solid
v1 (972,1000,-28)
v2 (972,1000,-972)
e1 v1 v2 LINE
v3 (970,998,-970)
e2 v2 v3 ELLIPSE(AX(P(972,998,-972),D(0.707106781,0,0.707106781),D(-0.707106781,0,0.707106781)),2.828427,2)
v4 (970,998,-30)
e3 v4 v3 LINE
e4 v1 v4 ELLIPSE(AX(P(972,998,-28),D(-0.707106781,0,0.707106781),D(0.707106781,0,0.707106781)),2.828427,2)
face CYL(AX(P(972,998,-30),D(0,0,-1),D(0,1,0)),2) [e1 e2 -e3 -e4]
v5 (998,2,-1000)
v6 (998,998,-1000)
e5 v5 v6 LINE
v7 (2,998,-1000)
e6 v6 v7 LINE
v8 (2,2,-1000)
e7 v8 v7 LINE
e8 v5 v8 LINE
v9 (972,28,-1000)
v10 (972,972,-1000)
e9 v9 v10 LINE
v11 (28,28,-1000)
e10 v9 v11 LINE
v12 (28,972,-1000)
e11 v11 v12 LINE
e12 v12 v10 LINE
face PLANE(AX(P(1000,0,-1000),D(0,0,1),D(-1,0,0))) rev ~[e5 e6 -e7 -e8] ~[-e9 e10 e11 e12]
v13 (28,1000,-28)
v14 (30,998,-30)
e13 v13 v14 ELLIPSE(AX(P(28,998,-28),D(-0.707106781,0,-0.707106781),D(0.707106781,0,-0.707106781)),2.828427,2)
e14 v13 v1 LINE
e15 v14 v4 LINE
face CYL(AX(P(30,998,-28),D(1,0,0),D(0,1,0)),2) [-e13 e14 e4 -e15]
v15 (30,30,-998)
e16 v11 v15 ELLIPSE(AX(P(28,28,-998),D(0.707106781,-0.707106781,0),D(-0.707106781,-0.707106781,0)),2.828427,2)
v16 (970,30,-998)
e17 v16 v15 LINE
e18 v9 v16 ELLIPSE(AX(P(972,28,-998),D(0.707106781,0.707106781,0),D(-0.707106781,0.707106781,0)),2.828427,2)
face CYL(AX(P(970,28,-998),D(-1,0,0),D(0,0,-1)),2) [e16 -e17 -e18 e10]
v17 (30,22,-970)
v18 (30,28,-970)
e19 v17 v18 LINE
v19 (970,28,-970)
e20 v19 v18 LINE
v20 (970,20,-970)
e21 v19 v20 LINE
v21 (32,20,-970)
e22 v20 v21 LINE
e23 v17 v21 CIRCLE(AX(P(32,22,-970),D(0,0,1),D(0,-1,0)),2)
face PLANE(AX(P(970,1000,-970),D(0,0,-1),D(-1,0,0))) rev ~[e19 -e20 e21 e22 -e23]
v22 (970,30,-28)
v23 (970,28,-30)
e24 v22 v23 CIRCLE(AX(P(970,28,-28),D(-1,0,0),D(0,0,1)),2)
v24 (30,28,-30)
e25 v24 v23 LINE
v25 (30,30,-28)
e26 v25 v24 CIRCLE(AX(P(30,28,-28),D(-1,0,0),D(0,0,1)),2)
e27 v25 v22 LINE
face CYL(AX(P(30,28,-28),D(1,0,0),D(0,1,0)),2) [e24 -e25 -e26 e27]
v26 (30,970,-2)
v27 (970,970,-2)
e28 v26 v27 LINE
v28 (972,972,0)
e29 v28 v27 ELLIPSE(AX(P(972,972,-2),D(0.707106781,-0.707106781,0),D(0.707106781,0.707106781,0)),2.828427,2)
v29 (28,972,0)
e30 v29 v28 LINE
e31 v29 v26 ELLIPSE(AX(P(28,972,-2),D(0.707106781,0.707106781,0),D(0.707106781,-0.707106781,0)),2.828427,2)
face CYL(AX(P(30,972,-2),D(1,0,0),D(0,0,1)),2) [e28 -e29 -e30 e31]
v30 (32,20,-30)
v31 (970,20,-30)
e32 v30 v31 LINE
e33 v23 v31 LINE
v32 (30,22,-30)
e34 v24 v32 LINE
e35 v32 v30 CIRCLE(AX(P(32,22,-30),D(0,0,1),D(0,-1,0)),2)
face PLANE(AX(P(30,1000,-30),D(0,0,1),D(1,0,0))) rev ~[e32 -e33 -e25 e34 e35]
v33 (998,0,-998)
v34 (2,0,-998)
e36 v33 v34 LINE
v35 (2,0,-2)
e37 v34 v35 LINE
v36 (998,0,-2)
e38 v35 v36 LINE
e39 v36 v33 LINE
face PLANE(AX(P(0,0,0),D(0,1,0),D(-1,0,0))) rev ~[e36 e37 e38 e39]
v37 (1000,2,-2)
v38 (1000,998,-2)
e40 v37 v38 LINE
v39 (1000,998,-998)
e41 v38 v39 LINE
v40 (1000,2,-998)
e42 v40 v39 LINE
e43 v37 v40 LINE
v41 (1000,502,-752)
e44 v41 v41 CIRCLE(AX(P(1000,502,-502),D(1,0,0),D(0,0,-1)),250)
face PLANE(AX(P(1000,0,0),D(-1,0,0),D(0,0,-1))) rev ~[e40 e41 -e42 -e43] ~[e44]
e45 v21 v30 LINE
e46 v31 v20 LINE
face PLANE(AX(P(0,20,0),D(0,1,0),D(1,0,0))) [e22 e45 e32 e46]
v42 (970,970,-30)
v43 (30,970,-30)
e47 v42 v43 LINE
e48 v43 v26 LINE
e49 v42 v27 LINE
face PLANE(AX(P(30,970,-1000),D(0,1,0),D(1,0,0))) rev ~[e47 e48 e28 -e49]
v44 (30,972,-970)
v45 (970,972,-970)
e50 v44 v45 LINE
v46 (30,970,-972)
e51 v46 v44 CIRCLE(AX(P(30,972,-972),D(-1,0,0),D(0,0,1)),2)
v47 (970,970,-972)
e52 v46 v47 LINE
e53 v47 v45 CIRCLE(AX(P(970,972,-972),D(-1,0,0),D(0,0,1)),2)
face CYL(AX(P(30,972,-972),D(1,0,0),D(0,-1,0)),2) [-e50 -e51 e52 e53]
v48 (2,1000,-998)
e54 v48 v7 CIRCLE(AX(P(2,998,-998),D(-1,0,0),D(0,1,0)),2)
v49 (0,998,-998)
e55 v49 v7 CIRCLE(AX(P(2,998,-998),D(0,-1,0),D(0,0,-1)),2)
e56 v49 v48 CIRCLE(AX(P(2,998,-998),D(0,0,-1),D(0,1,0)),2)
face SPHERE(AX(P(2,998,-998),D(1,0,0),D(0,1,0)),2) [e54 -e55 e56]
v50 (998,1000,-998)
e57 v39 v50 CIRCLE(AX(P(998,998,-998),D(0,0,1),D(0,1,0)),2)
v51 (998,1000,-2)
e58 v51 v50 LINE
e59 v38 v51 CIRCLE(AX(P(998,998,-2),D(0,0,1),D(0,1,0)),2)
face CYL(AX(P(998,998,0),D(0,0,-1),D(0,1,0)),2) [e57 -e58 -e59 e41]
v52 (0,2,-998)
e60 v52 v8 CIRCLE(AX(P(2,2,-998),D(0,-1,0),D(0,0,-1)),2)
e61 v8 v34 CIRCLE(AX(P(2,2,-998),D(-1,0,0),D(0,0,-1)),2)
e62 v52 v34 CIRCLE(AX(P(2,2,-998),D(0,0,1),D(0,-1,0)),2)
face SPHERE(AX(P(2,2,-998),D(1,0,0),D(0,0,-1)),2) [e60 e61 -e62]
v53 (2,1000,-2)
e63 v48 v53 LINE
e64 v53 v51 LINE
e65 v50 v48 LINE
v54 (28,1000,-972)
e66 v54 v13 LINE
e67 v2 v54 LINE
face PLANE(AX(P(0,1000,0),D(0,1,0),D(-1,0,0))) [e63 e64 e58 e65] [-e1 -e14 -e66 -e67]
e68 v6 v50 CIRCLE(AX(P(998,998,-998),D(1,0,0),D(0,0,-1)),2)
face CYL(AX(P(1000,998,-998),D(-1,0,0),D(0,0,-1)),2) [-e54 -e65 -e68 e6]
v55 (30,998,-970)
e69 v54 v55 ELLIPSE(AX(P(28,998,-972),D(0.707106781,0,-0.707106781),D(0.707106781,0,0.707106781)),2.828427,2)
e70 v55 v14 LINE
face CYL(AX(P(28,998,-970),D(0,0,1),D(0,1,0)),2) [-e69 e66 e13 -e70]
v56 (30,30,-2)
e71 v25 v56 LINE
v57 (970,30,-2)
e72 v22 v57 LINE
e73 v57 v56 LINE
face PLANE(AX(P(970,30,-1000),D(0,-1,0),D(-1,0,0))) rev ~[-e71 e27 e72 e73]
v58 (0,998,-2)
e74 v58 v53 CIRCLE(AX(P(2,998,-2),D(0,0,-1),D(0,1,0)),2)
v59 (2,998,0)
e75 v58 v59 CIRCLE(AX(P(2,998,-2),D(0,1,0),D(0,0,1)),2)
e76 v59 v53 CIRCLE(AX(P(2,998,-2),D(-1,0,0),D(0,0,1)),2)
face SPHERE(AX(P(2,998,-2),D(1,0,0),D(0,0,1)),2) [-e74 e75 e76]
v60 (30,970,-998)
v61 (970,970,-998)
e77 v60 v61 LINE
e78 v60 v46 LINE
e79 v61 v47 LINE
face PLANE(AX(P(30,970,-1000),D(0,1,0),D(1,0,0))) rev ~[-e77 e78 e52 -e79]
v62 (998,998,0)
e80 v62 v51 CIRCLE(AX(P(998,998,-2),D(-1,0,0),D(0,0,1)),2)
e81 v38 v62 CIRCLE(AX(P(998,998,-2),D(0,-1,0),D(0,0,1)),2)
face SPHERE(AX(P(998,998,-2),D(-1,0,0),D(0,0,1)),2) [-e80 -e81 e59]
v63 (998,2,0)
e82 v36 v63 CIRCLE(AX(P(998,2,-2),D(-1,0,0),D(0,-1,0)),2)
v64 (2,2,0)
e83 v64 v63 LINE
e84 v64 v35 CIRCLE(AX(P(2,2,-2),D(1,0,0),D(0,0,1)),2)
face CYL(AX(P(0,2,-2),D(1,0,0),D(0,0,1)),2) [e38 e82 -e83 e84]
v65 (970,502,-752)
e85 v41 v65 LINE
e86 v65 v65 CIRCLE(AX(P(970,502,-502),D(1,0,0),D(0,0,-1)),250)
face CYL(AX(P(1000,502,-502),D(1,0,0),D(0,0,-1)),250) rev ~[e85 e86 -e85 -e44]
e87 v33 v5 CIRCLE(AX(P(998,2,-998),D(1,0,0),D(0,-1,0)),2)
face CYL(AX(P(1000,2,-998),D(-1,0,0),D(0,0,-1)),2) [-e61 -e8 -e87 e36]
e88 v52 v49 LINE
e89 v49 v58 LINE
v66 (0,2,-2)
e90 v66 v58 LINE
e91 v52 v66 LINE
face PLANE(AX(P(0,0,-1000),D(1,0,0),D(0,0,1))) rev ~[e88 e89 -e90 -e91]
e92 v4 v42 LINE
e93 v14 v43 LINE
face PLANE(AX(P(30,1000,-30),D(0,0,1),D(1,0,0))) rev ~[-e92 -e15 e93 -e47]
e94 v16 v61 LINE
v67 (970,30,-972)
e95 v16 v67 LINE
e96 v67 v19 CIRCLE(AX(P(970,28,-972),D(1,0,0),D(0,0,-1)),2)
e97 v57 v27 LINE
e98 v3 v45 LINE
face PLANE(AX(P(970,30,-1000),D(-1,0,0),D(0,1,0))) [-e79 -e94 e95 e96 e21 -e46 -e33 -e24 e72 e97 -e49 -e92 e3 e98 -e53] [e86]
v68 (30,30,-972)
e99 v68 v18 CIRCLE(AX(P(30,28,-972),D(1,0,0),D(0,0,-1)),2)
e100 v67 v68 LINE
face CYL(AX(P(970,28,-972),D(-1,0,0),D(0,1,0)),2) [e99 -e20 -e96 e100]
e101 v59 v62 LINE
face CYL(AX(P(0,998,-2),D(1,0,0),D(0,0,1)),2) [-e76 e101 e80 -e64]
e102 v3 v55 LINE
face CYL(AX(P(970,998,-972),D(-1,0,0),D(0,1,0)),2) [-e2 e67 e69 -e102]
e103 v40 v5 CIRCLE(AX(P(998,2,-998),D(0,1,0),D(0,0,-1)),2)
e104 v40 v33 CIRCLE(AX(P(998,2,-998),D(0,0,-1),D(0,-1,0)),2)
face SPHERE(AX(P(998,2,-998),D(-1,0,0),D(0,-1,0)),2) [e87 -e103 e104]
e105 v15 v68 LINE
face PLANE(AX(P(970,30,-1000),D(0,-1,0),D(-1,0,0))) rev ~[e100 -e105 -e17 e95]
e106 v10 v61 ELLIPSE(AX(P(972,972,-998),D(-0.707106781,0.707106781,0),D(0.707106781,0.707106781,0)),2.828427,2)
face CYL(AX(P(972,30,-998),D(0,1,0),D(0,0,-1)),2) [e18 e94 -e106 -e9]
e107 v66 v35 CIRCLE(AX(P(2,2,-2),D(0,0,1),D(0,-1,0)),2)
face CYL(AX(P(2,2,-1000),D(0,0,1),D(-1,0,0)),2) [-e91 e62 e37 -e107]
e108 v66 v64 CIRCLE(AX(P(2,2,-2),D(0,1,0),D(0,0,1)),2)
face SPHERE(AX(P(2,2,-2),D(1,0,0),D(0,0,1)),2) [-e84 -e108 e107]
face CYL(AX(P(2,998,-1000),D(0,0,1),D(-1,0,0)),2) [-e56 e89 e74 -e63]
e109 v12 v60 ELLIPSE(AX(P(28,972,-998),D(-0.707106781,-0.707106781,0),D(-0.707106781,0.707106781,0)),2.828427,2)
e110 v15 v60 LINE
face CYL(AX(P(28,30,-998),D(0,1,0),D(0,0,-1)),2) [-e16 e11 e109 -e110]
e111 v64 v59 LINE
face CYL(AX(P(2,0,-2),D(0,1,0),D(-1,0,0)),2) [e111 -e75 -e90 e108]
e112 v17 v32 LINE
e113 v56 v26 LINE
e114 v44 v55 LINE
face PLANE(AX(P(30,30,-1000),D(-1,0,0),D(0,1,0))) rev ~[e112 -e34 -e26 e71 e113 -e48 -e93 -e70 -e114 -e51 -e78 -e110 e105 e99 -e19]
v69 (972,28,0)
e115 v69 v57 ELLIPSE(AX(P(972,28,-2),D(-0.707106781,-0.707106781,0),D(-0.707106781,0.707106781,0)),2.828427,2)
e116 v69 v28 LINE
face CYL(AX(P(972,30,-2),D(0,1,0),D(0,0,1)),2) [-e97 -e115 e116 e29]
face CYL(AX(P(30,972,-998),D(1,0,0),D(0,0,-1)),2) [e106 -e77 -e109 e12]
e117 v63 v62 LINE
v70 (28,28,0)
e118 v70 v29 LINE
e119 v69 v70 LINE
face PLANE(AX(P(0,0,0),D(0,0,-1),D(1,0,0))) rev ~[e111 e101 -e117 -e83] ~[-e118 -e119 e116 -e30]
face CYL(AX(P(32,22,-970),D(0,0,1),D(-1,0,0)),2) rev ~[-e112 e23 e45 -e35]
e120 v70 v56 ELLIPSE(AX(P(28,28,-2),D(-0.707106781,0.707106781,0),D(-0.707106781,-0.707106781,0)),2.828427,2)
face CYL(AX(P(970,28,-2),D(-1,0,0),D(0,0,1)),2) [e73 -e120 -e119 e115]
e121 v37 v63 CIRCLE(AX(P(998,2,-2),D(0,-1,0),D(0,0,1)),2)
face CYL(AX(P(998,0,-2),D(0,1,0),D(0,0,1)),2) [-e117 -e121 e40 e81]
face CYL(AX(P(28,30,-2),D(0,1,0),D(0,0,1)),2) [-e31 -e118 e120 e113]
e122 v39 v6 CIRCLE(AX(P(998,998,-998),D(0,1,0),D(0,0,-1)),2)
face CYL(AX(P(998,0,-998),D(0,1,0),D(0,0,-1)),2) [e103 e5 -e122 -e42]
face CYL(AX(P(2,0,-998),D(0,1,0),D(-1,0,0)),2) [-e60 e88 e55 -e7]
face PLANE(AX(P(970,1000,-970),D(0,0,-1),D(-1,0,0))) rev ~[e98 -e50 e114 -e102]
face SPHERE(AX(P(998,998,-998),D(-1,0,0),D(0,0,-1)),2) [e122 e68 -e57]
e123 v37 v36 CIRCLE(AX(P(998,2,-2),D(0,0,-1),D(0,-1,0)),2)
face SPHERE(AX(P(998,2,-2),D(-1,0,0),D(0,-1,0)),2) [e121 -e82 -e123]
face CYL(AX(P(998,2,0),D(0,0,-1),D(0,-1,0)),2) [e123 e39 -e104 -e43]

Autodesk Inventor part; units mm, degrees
ref_plane "YZ Plane" through (0, 0, 0) normal (1, 0, 0) x (0, 1, 0)
ref_plane "XZ Plane" through (0, 0, 0) normal (0, 1, 0) x (-1, 0, 0)
ref_plane "XY Plane" through (0, 0, 0) normal (0, 0, 1) x (1, 0, 0)
sketch "Sketch2" plane through (0, 0, 0) normal (0, 1, 0) x (-1, 0, 0)
  line L0 (0, 0) -> (-1000, 0)
  line L1 (-1000, 0) -> (-1000, -1000)
  line L2 (-1000, -1000) -> (0, -1000)
  line L3 (0, -1000) -> (0, 0)
  dimension "d0" = 1000
  dimension "d1" = 1000
extrude "Extrusion1" add sketch "Sketch2" along normal blind 1000
shell "Shell1" thickness 30 removed faces 0
sketch "Sketch3" plane through (0, 1000, 0) normal (0, 1, 0) x (1, 0, 0)
  line L0 (30, 30) -> (970, 30) projected
  line L1 (970, 30) -> (970, 970) projected
  line L2 (30, 30) -> (970, 30)
  line L3 (970, 30) -> (970, 970)
  line L4 (970, 970) -> (30, 970)
  line L5 (30, 970) -> (30, 30)
  point P0 (0, 0)
extrude "Extrusion2" cut sketch "Sketch3" against normal blind 980
sketch "Sketch4" plane through (1000, 0, -1000) normal (0, 0, -1) x (-1, 0, 0)
  line L0 (30, 20) -> (30, 1000) projected
  line L1 (30, 30) -> (970, 30)
  line L2 (970, 30) -> (970, 970)
  line L3 (970, 970) -> (30, 970)
  line L4 (30, 970) -> (30, 30)
  line L5 (0, 0) -> (0, 1000) projected
  line L6 (0, 1000) -> (1000, 1000) projected
  point P0 (1000, 0)
  point P1 (30, 970)
  dimension "d7" = 940
  dimension "d8" = 940
  dimension "d9" = 30
  dimension "d10" = 30
extrude "Extrusion3" cut sketch "Sketch4" against normal blind 1000
fillet "Fillet1" radius 2 28 edges at (500, 1000, -1000) (500, 1000, 0) (500, 0, -1000) (500, 0, 0) (0, 500, 0) (0, 1000, -500) (0, 500, -1000) (500, 1000, -30) (30, 1000, -500) (500, 1000, -970) (500, 970, -970) (500, 30, -1000) (500, 30, -970) (500, 30, -30) (500, 30, 0) (500, 970, 0) (30, 500, 0) (30, 500, -1000) (0, 0, -500) (1000, 0, -500) (970, 500, 0) (1000, 500, 0) (970, 500, -1000) (1000, 500, -1000) (970, 1000, -500) (1000, 1000, -500) (500, 970, -1000) (30, 20, -500)
sketch "Sketch5" plane through (1000, 2, -2) normal (1, 0, 0) x (0, 0, -1)
  circle A0 centre (500, 500) radius 250
  line L0 (996, 0) -> (0, 0) projected
  line L1 (0, 0) -> (0, 996) projected
  point P0 (-2, -2)
  dimension "d14" = 500
  dimension "d15" = 500
  dimension "d16" = 500
extrude "Extrusion4" cut sketch "Sketch5" against normal blind 100
properties part number "Body_prototype2"
